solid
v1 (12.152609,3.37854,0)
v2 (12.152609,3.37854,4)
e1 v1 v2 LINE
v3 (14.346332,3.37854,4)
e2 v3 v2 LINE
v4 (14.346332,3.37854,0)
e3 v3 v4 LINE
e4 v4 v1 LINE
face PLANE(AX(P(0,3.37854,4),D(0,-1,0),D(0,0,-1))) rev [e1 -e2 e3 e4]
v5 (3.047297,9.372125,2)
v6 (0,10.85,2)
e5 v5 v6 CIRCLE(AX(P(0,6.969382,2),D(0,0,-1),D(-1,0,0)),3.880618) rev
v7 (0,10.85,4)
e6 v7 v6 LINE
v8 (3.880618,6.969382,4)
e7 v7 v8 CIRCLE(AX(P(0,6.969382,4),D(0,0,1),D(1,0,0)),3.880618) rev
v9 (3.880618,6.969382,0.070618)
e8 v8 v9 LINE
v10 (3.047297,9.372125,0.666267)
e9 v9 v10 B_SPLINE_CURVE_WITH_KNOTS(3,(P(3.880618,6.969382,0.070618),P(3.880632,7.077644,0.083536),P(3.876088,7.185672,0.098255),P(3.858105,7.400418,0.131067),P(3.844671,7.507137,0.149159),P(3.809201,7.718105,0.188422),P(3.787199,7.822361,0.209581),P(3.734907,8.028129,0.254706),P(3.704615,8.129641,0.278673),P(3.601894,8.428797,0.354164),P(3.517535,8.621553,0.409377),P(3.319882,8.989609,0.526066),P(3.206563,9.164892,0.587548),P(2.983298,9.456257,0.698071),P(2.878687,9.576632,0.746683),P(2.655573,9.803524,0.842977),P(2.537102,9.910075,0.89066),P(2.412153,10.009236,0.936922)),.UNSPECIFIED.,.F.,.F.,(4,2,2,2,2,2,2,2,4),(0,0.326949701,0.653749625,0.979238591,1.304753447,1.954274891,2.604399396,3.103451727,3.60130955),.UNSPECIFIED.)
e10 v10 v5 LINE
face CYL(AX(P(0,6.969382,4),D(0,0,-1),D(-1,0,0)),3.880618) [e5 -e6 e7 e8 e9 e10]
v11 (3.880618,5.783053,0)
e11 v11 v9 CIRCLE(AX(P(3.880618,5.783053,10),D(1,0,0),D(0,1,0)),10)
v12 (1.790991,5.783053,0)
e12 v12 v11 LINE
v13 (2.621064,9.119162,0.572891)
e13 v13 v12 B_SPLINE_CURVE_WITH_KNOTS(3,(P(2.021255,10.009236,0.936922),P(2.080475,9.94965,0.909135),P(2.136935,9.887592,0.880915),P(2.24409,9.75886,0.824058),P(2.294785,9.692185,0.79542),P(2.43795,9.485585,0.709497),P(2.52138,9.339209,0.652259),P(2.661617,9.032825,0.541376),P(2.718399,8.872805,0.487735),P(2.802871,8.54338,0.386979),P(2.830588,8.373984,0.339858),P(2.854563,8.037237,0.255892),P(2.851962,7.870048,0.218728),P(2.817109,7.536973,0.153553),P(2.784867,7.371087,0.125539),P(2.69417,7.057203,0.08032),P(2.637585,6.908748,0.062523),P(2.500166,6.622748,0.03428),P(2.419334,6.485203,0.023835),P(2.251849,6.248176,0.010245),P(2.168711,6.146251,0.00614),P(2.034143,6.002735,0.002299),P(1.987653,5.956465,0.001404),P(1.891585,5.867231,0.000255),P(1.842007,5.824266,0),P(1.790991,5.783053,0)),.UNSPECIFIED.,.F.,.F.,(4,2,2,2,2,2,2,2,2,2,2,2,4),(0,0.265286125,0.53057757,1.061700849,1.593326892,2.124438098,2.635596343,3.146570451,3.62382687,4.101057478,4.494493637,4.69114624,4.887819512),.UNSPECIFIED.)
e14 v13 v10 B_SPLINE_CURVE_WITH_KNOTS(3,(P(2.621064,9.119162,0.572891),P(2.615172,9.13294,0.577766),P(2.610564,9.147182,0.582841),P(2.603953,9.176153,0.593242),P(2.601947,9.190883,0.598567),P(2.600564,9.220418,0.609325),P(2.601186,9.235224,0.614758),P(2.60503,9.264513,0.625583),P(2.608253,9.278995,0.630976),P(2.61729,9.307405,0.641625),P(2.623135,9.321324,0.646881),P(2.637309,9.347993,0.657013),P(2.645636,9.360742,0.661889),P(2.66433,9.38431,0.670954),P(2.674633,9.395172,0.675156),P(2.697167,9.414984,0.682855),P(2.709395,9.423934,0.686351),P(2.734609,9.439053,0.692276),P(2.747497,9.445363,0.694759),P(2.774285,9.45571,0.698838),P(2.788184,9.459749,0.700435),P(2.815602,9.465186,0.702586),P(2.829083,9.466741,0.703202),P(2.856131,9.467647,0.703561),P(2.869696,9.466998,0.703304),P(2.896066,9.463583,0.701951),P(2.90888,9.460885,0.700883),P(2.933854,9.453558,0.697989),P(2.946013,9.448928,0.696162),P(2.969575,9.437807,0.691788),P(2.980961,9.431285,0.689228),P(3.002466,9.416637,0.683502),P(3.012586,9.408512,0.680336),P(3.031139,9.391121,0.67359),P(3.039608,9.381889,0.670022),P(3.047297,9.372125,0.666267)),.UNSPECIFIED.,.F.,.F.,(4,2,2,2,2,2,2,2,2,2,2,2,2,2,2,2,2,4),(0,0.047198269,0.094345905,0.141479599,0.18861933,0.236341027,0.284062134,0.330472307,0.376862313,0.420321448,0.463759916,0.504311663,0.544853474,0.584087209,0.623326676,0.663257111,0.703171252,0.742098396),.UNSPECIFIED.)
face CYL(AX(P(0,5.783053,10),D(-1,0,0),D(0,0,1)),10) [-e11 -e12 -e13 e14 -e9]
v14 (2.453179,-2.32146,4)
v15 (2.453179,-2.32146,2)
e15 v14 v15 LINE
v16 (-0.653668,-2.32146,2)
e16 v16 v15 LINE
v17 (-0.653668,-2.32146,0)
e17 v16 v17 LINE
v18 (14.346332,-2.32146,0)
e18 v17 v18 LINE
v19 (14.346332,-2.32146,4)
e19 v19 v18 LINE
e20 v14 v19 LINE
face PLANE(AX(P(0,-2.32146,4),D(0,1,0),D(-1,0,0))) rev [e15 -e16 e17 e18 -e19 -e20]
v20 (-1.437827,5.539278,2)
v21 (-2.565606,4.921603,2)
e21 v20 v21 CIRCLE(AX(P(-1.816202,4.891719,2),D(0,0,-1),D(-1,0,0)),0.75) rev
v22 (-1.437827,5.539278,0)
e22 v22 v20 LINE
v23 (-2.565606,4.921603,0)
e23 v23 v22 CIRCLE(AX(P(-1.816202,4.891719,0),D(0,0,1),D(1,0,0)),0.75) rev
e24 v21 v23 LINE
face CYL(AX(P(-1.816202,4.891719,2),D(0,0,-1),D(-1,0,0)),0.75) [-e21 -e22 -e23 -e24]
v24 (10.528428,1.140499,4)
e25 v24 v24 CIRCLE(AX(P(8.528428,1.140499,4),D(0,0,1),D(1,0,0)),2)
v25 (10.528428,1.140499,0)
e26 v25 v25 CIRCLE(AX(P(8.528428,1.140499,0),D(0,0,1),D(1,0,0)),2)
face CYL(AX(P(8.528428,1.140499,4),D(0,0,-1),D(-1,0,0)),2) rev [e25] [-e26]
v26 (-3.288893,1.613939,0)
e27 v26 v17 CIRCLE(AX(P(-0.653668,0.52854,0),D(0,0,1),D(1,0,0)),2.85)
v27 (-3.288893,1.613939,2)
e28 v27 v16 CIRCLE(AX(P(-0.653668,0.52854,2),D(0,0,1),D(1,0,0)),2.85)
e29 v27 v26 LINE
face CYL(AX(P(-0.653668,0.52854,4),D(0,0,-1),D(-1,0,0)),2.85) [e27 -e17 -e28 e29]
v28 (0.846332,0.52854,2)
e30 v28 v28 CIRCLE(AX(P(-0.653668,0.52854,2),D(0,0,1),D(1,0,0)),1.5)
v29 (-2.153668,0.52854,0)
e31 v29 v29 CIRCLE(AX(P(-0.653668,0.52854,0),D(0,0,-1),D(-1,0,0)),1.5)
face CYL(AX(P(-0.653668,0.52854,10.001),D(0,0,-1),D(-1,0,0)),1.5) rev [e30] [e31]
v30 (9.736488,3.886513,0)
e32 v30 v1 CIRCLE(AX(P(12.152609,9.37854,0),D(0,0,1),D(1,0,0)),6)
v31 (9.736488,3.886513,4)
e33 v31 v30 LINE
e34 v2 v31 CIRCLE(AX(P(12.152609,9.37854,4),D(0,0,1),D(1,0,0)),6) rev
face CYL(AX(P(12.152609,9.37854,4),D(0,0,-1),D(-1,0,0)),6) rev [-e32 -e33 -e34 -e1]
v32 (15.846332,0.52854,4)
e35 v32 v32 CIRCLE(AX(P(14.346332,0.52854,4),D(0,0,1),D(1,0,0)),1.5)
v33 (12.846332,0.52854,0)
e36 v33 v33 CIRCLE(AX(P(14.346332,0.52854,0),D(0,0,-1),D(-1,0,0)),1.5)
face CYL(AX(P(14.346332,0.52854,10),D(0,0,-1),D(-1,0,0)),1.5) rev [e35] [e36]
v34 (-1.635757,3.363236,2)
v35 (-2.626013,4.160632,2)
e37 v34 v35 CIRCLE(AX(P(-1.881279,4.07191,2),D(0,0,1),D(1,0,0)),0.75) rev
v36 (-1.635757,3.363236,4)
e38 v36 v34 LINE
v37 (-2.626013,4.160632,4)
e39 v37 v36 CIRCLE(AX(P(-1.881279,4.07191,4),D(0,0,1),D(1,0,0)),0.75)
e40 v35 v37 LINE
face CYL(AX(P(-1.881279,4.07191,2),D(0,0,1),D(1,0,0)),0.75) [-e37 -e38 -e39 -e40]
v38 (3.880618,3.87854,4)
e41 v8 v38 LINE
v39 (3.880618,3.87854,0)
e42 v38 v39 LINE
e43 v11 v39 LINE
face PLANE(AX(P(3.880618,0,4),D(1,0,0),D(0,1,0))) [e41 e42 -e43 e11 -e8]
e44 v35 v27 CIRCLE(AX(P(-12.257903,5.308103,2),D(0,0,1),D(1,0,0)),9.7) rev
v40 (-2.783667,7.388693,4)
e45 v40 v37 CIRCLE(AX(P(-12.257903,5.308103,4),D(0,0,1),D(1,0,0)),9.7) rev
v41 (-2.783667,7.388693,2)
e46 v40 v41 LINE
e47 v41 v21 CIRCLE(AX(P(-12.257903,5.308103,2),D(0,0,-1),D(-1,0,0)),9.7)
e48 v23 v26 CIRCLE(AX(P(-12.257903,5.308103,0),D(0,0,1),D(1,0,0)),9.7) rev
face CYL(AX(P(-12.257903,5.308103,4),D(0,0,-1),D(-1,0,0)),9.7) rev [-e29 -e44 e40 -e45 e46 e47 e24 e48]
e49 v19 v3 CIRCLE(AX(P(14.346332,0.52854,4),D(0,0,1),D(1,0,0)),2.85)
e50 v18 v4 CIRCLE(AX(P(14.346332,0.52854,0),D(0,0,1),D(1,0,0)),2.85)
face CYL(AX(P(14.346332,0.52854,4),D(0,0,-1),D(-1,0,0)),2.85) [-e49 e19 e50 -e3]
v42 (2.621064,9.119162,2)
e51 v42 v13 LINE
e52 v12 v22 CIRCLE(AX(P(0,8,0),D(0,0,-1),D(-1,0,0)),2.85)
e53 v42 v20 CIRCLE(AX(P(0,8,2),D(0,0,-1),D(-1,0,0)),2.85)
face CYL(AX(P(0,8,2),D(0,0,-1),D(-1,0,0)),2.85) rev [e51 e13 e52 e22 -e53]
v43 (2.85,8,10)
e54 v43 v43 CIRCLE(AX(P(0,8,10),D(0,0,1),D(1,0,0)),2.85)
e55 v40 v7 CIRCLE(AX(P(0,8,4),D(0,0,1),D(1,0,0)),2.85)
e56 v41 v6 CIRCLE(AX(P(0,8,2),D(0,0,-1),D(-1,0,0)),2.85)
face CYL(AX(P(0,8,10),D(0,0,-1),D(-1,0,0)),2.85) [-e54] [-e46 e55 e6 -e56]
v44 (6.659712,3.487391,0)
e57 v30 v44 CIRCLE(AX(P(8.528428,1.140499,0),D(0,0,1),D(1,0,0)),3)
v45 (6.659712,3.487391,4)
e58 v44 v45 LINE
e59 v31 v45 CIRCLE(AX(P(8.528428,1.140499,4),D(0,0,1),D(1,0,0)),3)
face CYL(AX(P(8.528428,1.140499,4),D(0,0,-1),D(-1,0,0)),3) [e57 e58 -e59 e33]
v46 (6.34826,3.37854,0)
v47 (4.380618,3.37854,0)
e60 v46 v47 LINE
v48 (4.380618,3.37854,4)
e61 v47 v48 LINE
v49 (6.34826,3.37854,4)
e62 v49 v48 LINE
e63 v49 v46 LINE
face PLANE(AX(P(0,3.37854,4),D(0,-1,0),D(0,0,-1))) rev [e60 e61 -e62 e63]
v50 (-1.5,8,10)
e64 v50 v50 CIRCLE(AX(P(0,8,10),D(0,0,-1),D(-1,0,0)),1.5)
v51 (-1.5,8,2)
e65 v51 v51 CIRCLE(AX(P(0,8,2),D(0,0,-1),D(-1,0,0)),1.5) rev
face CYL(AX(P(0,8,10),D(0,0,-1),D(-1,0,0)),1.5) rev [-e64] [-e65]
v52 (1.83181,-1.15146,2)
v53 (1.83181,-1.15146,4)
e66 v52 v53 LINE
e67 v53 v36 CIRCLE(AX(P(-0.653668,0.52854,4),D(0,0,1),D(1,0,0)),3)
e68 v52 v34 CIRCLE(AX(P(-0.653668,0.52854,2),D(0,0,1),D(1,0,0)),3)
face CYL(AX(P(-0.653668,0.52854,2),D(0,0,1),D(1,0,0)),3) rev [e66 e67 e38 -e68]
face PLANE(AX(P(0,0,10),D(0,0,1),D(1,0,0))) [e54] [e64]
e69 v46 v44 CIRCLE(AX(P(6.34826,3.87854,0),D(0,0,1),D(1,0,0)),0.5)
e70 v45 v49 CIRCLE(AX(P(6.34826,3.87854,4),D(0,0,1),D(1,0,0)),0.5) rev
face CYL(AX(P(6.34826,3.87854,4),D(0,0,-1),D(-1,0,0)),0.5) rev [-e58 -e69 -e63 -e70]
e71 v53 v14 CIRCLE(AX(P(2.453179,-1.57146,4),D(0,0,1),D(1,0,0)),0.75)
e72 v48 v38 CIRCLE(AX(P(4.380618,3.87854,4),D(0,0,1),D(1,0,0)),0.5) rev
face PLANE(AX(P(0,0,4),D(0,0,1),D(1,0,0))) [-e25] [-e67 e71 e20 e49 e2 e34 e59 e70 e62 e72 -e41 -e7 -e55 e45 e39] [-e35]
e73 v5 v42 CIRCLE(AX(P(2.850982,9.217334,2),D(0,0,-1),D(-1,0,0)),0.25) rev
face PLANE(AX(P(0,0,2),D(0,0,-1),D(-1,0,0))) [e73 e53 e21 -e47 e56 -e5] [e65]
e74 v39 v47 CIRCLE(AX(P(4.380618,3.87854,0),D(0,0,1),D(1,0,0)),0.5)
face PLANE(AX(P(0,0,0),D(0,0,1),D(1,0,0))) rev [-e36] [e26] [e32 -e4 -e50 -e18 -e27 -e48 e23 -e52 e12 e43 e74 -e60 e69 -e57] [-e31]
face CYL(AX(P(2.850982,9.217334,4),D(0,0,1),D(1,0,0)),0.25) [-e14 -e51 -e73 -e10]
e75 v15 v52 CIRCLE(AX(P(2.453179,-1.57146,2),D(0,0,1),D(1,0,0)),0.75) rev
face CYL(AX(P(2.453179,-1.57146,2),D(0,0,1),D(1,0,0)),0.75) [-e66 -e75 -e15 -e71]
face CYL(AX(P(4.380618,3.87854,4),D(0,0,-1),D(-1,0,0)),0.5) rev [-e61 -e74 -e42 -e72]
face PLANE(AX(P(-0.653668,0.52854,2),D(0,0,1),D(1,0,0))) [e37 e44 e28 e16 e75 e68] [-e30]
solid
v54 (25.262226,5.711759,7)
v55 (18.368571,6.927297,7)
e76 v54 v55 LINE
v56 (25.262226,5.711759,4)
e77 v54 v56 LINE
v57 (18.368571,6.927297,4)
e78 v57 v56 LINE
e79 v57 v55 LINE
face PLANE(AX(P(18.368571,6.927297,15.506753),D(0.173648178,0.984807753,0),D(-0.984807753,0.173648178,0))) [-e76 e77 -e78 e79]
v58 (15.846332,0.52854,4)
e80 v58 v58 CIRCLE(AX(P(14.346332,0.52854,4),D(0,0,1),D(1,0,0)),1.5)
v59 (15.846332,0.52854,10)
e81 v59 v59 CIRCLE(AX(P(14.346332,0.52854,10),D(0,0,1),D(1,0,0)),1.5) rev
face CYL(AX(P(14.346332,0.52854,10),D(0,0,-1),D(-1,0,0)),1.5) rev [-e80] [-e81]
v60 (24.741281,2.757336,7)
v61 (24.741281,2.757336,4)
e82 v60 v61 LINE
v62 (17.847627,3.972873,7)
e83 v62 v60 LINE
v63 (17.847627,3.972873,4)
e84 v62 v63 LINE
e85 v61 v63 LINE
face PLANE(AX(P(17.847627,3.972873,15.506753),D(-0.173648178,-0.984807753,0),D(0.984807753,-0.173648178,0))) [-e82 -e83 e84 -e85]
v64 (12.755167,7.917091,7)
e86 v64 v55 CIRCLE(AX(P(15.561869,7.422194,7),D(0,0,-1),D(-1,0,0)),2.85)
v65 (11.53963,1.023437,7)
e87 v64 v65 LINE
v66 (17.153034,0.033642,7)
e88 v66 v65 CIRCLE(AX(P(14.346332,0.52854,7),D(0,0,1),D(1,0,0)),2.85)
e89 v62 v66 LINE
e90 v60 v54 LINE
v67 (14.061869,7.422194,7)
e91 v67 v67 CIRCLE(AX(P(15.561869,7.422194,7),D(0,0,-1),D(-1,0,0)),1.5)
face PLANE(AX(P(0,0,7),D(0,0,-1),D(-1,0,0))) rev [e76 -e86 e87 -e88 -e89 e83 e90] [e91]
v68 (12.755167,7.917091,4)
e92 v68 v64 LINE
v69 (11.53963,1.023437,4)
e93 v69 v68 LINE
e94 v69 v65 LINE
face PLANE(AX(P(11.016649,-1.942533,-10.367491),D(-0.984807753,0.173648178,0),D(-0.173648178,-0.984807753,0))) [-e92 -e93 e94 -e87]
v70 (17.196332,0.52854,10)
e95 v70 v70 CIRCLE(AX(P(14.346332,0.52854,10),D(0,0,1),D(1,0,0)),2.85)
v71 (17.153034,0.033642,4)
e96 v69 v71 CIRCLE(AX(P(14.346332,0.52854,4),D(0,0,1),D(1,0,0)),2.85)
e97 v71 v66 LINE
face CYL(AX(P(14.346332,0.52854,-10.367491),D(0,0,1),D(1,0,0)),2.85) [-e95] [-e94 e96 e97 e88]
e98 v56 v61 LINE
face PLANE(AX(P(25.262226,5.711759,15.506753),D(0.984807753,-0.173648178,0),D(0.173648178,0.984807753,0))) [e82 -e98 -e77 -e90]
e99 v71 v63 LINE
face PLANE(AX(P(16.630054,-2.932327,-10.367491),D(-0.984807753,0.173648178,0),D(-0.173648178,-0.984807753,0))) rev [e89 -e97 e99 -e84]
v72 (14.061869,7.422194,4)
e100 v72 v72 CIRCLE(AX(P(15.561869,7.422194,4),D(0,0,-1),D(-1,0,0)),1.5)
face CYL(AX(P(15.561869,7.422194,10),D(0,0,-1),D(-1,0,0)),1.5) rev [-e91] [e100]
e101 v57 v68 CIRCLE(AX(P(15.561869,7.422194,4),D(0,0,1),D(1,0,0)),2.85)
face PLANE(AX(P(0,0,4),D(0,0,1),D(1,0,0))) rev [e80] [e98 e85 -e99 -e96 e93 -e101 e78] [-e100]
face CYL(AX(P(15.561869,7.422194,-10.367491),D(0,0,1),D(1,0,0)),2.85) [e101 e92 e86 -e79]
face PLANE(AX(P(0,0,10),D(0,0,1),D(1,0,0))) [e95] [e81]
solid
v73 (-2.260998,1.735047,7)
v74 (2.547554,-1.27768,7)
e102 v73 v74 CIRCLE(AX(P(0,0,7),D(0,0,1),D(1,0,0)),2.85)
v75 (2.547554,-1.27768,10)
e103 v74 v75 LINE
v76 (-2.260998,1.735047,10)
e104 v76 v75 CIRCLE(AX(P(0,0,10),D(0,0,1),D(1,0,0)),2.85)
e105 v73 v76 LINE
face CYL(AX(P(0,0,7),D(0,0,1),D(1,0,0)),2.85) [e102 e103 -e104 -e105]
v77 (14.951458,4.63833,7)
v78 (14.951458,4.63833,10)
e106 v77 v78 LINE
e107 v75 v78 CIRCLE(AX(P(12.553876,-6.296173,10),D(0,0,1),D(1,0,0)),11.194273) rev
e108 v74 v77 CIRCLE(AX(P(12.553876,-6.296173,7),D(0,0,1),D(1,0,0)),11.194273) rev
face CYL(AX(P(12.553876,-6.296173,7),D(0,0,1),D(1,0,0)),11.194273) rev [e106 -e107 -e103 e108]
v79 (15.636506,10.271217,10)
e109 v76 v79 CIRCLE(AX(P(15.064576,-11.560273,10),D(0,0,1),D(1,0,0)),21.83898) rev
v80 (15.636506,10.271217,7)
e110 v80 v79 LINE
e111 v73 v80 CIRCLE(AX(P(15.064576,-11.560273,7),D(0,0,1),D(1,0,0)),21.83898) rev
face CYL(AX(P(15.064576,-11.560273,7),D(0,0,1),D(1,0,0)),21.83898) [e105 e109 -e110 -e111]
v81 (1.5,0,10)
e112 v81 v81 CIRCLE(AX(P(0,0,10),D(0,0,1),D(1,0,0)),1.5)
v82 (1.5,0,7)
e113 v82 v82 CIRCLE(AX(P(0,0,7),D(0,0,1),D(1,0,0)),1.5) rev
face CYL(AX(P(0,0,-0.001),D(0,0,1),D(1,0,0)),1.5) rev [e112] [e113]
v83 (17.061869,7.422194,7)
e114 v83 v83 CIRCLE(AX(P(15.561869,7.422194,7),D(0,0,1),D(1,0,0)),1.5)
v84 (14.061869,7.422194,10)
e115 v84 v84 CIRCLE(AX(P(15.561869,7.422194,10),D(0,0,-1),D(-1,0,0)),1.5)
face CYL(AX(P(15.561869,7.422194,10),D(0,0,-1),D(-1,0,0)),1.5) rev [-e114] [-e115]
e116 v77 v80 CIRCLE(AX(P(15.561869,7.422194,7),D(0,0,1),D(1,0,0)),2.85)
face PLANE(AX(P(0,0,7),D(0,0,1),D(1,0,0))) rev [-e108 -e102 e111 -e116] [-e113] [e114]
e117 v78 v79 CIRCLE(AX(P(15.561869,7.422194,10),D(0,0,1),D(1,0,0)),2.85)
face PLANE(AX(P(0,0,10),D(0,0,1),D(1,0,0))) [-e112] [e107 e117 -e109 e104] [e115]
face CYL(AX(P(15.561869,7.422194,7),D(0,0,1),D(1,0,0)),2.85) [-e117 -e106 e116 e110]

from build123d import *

# Parameters (mm, degrees)
SKETCH1_R            = 2.85
BOSS_EXTRUDE1_DEPTH  = 10
SKETCH1_3_R          = 2
BOSS_EXTRUDE2_DEPTH  = 4
SKETCH2_R            = 2.85
BOSS_EXTRUDE3_DEPTH  = 3
BOSS_EXTRUDE5_DEPTH  = 3
HOLE1_START          = 4
HOLE1_OUTLINE_R      = 1.5
HOLE1_DEPTH          = 3
HOLE1_START_2        = 7
HOLE1_2_OUTLINE_R    = 1.5
HOLE1_2_DEPTH        = 3
HOLE2_START          = 4
HOLE2_OUTLINE_R      = 1.5
HOLE2_DEPTH          = 3
HOLE2_2_OUTLINE_R    = 1.5
HOLE2_2_DEPTH        = 4
HOLE3_START          = -1
HOLE3_OUTLINE_R      = 1.5
HOLE3_DEPTH          = 11
HOLE4_OUTLINE_R      = 1.5
HOLE4_DEPTH          = 4
HOLE5_START          = 7
HOLE5_OUTLINE_R      = 1.5
HOLE5_DEPTH          = 3
SKETCH9_R            = 1.5
CUT_EXTRUDE1_DEPTH   = 2
CUT_EXTRUDE2_START   = -2
SKETCH10_R           = 3
SKETCH10_R_2         = 1.5
CUT_EXTRUDE2_DEPTH   = 2
SKETCH13_R           = 1.5
BOSS_EXTRUDE7_DEPTH  = 3
MOVE_START           = 3.380946094
MOVE_FACE1_OUTLINE_W = 7
MOVE_FACE1_OUTLINE_H = 6
MOVE_FACE1_DEPTH     = 2.619053906
FILLET3_R            = 10
FILLET4_START        = 0.070618077
FILLET4_DEPTH        = 1.929381923
FILLET6_R            = 0.75
FILLET1_R            = 0.5
FILLET2_R            = 6
FILLET7_R            = 0.75
BOSS_EXTRUDE6_DEPTH  = 3


with BuildPart() as part:
    # Sketch1 → Boss-Extrude1 (new body)
    with BuildSketch(Plane.XY):
        with Locations((0, 8)):
            Circle(SKETCH1_R)
    extrude(amount=BOSS_EXTRUDE1_DEPTH)

    # Sketch1<3> → Boss-Extrude2 (add)
    with BuildSketch(Plane.XY):
        with BuildLine():
            ThreePointArc((-3.288892787, 1.613938628), (-3.021777735, -1.057195592), (-0.653668071, -2.321460236))
            Line((-0.653668071, -2.321460236), (14.346331929, -2.321460236))
            ThreePointArc((14.346331929, -2.321460236), (17.196331929, 0.528539764), (14.346331929, 3.378539764))
            Line((14.346331929, 3.378539764), (10.52622042, 3.378539764))
            ThreePointArc((10.52622042, 3.378539764), (8.52842804, 4.140499191), (6.530635661, 3.378539764))
            Line((6.530635661, 3.378539764), (3.880617573, 3.378539764))
            Line((3.880617573, 3.378539764), (3.880617573, 6.969382427))
            ThreePointArc((3.880617573, 6.969382427), (2.744011001, 9.713393428), (0, 10.85))
            ThreePointArc((0, 10.85), (2.220892349, 6.213904489), (-2.783667267, 7.388692754))
            ThreePointArc((-2.783667267, 7.388692754), (-2.594814655, 4.462692475), (-3.288892787, 1.613938628))
        make_face()
        with Locations((8.52842804, 1.140499191)):
            Circle(SKETCH1_3_R, mode=Mode.SUBTRACT)
    extrude(amount=BOSS_EXTRUDE2_DEPTH)

    # Hole2 2 outline → Hole2 2 (cut)
    with BuildSketch(Plane.XY):
        with Locations((14.346331929, 0.528539764)):
            Circle(HOLE2_2_OUTLINE_R)
    extrude(amount=HOLE2_2_DEPTH, mode=Mode.SUBTRACT)

    # Hole3: read off the stored shape, not the designer's step
    # Hole3 outline → Hole3 (cut)
    with BuildSketch(Plane.XY.offset(HOLE3_START)):
        with Locations((0, 8)):
            Circle(HOLE3_OUTLINE_R)
    extrude(amount=HOLE3_DEPTH, mode=Mode.SUBTRACT)

    # Hole4: read off the stored shape, not the designer's step
    # Hole4 outline → Hole4 (cut)
    with BuildSketch(Plane.XY):
        with Locations((-0.653668071, 0.528539764)):
            Circle(HOLE4_OUTLINE_R)
    extrude(amount=HOLE4_DEPTH, mode=Mode.SUBTRACT)

    # Sketch9 → Cut-Extrude1 (cut)
    with BuildSketch(Plane(origin=(0, 0, 0), x_dir=(-1, 0, 0), z_dir=(0, 0, -1))):
        with BuildLine():
            ThreePointArc((2.783667267, 7.388692754), (2.833368288, 7.692552207), (2.85, 8))
            ThreePointArc((2.85, 8), (2.015254326, 10.015254326), (0, 10.85))
            ThreePointArc((0, 10.85), (-2.220892349, 6.213904489), (2.783667267, 7.388692754))
        make_face()
        with Locations((0, 8)):
            Circle(SKETCH9_R, mode=Mode.SUBTRACT)
    extrude(amount=-CUT_EXTRUDE1_DEPTH, mode=Mode.SUBTRACT)

    # Sketch10 → Cut-Extrude2 (cut)
    with BuildSketch(Plane.XY.offset(4).offset(CUT_EXTRUDE2_START)):
        with Locations((-0.653668071, 0.528539764)):
            Circle(SKETCH10_R)
        with Locations(Location((-0.653668071, 0.528539764, 0), (0, 0, 180))):
            Circle(SKETCH10_R_2, mode=Mode.SUBTRACT)
    extrude(amount=CUT_EXTRUDE2_DEPTH, mode=Mode.SUBTRACT)

    # Move Face1: read off the stored shape, not the designer's step
    # Move Face1 outline → Move Face1 (cut)
    with BuildSketch(Plane(origin=(0, 0, 0), x_dir=(1, 0, 0), z_dir=(0, 0.4226182617406999, -0.9063077870366498)).offset(MOVE_START)):
        with Locations((1.5, -9)):
            Rectangle(MOVE_FACE1_OUTLINE_W, MOVE_FACE1_OUTLINE_H)
    extrude(amount=MOVE_FACE1_DEPTH, mode=Mode.SUBTRACT)

    # Fillet3
    fillet3_edges = [part.edges().sort_by_distance(p)[0] for p in [
        (3.295629584, 8, 0),
    ]]
    fillet(fillet3_edges, radius=FILLET3_R)

    # Fillet4: read off the stored shape, not the designer's step
    # Fillet4 outline → Fillet4 (cut)
    with BuildSketch(Plane.XY.offset(FILLET4_START)):
        with BuildLine():
            ThreePointArc((2.621064074, 9.119161794), (2.723389269, 9.432322489), (3.047297197, 9.37212514))
            ThreePointArc((3.047297197, 9.37212514), (1.693379336, 10.461038076), (0, 10.85))
            ThreePointArc((0, 10.85), (1.570491784, 10.378246319), (2.621064074, 9.119161794))
        make_face()
    extrude(amount=FILLET4_DEPTH, mode=Mode.SUBTRACT)

    # Fillet6
    # the kernel refuses this fillet: 0.75 mm, written as the material it takes off along each edge
    with BuildSketch(Plane(origin=(-2.783667267, 7.388692754, -6.191769665), x_dir=(0.5884037182899365, -0.80856729114068, 0), z_dir=(0, 0, 1))) as fillet6_piece_1:
        with BuildLine():
            CenterArc((2.588231391, -0.686967831), FILLET6_R, 113.657983214, 118.014627982)
            ThreePointArc((2.123115813, -1.275327839), (1.102428919, -0.569623459), (0, 0))
            ThreePointArc((0, 0), (1.143637126, -0.239522242), (2.287274252, 0))
        make_face()
    extrude(amount=8.191769665, mode=Mode.SUBTRACT)

    # Fillet1
    fillet1_edges = [part.edges().sort_by_distance(p)[0] for p in [
        (3.880617573, 3.378539764, 2),
        (6.530635661, 3.378539764, 2),
    ]]
    fillet(fillet1_edges, radius=FILLET1_R)

    # Fillet2
    fillet2_edges = [part.edges().sort_by_distance(p)[0] for p in [
        (10.52622042, 3.378539764, 2),
    ]]
    fillet(fillet2_edges, radius=FILLET2_R)

    # Fillet7
    fillet7_edges = [part.edges().sort_by_distance(p)[0] for p in [
        (-3.007860636, 2.388049745, 3),
        (0.283081629, -2.321460236, 3),
    ]]
    fillet(fillet7_edges, radius=FILLET7_R)


with BuildPart() as body_2:
    # Sketch2 → Boss-Extrude3 (new body)
    with BuildSketch(Plane.XY.offset(10)):
        Circle(SKETCH2_R)
        with BuildLine():
            ThreePointArc((-2.260997744, 1.73504732), (0.916148577, 2.69873522), (2.85, 0))
            ThreePointArc((2.85, 0), (2.77335805, -0.656494575), (2.547554297, -1.277680361))
            ThreePointArc((2.547554297, -1.277680361), (7.734848749, 3.807723671), (14.951458123, 4.638330111))
            ThreePointArc((14.951458123, 4.638330111), (12.732714566, 7.766264099), (15.636506436, 10.271216548))
            ThreePointArc((15.636506436, 10.271216548), (5.663103388, 8.151483767), (-2.260997744, 1.73504732))
        make_face()
        with Locations((15.561869173, 7.422194035)):
            Circle(SKETCH2_R)
    extrude(amount=-BOSS_EXTRUDE3_DEPTH)

    # Hole1 2 outline → Hole1 2 (cut)
    with BuildSketch(Plane.XY.offset(HOLE1_START_2)):
        with Locations((15.561869173, 7.422194035)):
            Circle(HOLE1_2_OUTLINE_R)
    extrude(amount=HOLE1_2_DEPTH, mode=Mode.SUBTRACT)

    # Hole5: read off the stored shape, not the designer's step
    # Hole5 outline → Hole5 (cut)
    with BuildSketch(Plane.XY.offset(HOLE5_START)):
        Circle(HOLE5_OUTLINE_R)
    extrude(amount=HOLE5_DEPTH, mode=Mode.SUBTRACT)


with BuildPart() as body_3:
    # Sketch3 → Boss-Extrude5 (new body)
    with BuildSketch(Plane(origin=(0, 0, 7), x_dir=(-1, 0, 0), z_dir=(0, 0, -1))):
        with BuildLine():
            ThreePointArc((-12.755167077, 7.917091342), (-16.056766479, 10.228896131), (-18.368571269, 6.927296729))
            Line((-18.368571269, 6.927296729), (-17.153034025, 0.033642458))
            ThreePointArc((-17.153034025, 0.033642458), (-13.851434623, -2.278162332), (-11.539629833, 1.023437071))
            Line((-11.539629833, 1.023437071), (-12.755167077, 7.917091342))
        make_face()
    extrude(amount=BOSS_EXTRUDE5_DEPTH)

    # Hole1: read off the stored shape, not the designer's step
    # Hole1 outline → Hole1 (cut)
    with BuildSketch(Plane.XY.offset(HOLE1_START)):
        with Locations((15.561869173, 7.422194035)):
            Circle(HOLE1_OUTLINE_R)
    extrude(amount=HOLE1_DEPTH, mode=Mode.SUBTRACT)

    # Hole2: read off the stored shape, not the designer's step
    # Hole2 outline → Hole2 (cut)
    with BuildSketch(Plane.XY.offset(HOLE2_START)):
        with Locations((14.346331929, 0.528539764)):
            Circle(HOLE2_OUTLINE_R)
    extrude(amount=HOLE2_DEPTH, mode=Mode.SUBTRACT)

    # Sketch13 → Boss-Extrude7 (add)
    with BuildSketch(Plane.XY.offset(7)):
        with BuildLine():
            ThreePointArc((17.153034025, 0.033642458), (17.185486819, 0.280145897), (17.196331929, 0.528539764))
            ThreePointArc((17.196331929, 0.528539764), (14.594725796, 3.367694654), (11.539629833, 1.023437071))
            ThreePointArc((11.539629833, 1.023437071), (13.851434623, -2.278162332), (17.153034025, 0.033642458))
        make_face()
        with Locations((14.346331929, 0.528539764)):
            Circle(SKETCH13_R, mode=Mode.SUBTRACT)
    extrude(amount=BOSS_EXTRUDE7_DEPTH)

    # Sketch12 → Boss-Extrude6 (add)
    with BuildSketch(Plane(origin=(0, 0, 4), x_dir=(-1, 0, 0), z_dir=(0, 0, -1))):
        Polygon((-18.368571269, 6.927296729), (-17.847626736, 3.97287347), (-24.741281007, 2.757336226), (-25.26222554, 5.711759485), align=None)
    extrude(amount=-BOSS_EXTRUDE6_DEPTH)


solid = Compound([part.part, body_2.part, body_3.part])
